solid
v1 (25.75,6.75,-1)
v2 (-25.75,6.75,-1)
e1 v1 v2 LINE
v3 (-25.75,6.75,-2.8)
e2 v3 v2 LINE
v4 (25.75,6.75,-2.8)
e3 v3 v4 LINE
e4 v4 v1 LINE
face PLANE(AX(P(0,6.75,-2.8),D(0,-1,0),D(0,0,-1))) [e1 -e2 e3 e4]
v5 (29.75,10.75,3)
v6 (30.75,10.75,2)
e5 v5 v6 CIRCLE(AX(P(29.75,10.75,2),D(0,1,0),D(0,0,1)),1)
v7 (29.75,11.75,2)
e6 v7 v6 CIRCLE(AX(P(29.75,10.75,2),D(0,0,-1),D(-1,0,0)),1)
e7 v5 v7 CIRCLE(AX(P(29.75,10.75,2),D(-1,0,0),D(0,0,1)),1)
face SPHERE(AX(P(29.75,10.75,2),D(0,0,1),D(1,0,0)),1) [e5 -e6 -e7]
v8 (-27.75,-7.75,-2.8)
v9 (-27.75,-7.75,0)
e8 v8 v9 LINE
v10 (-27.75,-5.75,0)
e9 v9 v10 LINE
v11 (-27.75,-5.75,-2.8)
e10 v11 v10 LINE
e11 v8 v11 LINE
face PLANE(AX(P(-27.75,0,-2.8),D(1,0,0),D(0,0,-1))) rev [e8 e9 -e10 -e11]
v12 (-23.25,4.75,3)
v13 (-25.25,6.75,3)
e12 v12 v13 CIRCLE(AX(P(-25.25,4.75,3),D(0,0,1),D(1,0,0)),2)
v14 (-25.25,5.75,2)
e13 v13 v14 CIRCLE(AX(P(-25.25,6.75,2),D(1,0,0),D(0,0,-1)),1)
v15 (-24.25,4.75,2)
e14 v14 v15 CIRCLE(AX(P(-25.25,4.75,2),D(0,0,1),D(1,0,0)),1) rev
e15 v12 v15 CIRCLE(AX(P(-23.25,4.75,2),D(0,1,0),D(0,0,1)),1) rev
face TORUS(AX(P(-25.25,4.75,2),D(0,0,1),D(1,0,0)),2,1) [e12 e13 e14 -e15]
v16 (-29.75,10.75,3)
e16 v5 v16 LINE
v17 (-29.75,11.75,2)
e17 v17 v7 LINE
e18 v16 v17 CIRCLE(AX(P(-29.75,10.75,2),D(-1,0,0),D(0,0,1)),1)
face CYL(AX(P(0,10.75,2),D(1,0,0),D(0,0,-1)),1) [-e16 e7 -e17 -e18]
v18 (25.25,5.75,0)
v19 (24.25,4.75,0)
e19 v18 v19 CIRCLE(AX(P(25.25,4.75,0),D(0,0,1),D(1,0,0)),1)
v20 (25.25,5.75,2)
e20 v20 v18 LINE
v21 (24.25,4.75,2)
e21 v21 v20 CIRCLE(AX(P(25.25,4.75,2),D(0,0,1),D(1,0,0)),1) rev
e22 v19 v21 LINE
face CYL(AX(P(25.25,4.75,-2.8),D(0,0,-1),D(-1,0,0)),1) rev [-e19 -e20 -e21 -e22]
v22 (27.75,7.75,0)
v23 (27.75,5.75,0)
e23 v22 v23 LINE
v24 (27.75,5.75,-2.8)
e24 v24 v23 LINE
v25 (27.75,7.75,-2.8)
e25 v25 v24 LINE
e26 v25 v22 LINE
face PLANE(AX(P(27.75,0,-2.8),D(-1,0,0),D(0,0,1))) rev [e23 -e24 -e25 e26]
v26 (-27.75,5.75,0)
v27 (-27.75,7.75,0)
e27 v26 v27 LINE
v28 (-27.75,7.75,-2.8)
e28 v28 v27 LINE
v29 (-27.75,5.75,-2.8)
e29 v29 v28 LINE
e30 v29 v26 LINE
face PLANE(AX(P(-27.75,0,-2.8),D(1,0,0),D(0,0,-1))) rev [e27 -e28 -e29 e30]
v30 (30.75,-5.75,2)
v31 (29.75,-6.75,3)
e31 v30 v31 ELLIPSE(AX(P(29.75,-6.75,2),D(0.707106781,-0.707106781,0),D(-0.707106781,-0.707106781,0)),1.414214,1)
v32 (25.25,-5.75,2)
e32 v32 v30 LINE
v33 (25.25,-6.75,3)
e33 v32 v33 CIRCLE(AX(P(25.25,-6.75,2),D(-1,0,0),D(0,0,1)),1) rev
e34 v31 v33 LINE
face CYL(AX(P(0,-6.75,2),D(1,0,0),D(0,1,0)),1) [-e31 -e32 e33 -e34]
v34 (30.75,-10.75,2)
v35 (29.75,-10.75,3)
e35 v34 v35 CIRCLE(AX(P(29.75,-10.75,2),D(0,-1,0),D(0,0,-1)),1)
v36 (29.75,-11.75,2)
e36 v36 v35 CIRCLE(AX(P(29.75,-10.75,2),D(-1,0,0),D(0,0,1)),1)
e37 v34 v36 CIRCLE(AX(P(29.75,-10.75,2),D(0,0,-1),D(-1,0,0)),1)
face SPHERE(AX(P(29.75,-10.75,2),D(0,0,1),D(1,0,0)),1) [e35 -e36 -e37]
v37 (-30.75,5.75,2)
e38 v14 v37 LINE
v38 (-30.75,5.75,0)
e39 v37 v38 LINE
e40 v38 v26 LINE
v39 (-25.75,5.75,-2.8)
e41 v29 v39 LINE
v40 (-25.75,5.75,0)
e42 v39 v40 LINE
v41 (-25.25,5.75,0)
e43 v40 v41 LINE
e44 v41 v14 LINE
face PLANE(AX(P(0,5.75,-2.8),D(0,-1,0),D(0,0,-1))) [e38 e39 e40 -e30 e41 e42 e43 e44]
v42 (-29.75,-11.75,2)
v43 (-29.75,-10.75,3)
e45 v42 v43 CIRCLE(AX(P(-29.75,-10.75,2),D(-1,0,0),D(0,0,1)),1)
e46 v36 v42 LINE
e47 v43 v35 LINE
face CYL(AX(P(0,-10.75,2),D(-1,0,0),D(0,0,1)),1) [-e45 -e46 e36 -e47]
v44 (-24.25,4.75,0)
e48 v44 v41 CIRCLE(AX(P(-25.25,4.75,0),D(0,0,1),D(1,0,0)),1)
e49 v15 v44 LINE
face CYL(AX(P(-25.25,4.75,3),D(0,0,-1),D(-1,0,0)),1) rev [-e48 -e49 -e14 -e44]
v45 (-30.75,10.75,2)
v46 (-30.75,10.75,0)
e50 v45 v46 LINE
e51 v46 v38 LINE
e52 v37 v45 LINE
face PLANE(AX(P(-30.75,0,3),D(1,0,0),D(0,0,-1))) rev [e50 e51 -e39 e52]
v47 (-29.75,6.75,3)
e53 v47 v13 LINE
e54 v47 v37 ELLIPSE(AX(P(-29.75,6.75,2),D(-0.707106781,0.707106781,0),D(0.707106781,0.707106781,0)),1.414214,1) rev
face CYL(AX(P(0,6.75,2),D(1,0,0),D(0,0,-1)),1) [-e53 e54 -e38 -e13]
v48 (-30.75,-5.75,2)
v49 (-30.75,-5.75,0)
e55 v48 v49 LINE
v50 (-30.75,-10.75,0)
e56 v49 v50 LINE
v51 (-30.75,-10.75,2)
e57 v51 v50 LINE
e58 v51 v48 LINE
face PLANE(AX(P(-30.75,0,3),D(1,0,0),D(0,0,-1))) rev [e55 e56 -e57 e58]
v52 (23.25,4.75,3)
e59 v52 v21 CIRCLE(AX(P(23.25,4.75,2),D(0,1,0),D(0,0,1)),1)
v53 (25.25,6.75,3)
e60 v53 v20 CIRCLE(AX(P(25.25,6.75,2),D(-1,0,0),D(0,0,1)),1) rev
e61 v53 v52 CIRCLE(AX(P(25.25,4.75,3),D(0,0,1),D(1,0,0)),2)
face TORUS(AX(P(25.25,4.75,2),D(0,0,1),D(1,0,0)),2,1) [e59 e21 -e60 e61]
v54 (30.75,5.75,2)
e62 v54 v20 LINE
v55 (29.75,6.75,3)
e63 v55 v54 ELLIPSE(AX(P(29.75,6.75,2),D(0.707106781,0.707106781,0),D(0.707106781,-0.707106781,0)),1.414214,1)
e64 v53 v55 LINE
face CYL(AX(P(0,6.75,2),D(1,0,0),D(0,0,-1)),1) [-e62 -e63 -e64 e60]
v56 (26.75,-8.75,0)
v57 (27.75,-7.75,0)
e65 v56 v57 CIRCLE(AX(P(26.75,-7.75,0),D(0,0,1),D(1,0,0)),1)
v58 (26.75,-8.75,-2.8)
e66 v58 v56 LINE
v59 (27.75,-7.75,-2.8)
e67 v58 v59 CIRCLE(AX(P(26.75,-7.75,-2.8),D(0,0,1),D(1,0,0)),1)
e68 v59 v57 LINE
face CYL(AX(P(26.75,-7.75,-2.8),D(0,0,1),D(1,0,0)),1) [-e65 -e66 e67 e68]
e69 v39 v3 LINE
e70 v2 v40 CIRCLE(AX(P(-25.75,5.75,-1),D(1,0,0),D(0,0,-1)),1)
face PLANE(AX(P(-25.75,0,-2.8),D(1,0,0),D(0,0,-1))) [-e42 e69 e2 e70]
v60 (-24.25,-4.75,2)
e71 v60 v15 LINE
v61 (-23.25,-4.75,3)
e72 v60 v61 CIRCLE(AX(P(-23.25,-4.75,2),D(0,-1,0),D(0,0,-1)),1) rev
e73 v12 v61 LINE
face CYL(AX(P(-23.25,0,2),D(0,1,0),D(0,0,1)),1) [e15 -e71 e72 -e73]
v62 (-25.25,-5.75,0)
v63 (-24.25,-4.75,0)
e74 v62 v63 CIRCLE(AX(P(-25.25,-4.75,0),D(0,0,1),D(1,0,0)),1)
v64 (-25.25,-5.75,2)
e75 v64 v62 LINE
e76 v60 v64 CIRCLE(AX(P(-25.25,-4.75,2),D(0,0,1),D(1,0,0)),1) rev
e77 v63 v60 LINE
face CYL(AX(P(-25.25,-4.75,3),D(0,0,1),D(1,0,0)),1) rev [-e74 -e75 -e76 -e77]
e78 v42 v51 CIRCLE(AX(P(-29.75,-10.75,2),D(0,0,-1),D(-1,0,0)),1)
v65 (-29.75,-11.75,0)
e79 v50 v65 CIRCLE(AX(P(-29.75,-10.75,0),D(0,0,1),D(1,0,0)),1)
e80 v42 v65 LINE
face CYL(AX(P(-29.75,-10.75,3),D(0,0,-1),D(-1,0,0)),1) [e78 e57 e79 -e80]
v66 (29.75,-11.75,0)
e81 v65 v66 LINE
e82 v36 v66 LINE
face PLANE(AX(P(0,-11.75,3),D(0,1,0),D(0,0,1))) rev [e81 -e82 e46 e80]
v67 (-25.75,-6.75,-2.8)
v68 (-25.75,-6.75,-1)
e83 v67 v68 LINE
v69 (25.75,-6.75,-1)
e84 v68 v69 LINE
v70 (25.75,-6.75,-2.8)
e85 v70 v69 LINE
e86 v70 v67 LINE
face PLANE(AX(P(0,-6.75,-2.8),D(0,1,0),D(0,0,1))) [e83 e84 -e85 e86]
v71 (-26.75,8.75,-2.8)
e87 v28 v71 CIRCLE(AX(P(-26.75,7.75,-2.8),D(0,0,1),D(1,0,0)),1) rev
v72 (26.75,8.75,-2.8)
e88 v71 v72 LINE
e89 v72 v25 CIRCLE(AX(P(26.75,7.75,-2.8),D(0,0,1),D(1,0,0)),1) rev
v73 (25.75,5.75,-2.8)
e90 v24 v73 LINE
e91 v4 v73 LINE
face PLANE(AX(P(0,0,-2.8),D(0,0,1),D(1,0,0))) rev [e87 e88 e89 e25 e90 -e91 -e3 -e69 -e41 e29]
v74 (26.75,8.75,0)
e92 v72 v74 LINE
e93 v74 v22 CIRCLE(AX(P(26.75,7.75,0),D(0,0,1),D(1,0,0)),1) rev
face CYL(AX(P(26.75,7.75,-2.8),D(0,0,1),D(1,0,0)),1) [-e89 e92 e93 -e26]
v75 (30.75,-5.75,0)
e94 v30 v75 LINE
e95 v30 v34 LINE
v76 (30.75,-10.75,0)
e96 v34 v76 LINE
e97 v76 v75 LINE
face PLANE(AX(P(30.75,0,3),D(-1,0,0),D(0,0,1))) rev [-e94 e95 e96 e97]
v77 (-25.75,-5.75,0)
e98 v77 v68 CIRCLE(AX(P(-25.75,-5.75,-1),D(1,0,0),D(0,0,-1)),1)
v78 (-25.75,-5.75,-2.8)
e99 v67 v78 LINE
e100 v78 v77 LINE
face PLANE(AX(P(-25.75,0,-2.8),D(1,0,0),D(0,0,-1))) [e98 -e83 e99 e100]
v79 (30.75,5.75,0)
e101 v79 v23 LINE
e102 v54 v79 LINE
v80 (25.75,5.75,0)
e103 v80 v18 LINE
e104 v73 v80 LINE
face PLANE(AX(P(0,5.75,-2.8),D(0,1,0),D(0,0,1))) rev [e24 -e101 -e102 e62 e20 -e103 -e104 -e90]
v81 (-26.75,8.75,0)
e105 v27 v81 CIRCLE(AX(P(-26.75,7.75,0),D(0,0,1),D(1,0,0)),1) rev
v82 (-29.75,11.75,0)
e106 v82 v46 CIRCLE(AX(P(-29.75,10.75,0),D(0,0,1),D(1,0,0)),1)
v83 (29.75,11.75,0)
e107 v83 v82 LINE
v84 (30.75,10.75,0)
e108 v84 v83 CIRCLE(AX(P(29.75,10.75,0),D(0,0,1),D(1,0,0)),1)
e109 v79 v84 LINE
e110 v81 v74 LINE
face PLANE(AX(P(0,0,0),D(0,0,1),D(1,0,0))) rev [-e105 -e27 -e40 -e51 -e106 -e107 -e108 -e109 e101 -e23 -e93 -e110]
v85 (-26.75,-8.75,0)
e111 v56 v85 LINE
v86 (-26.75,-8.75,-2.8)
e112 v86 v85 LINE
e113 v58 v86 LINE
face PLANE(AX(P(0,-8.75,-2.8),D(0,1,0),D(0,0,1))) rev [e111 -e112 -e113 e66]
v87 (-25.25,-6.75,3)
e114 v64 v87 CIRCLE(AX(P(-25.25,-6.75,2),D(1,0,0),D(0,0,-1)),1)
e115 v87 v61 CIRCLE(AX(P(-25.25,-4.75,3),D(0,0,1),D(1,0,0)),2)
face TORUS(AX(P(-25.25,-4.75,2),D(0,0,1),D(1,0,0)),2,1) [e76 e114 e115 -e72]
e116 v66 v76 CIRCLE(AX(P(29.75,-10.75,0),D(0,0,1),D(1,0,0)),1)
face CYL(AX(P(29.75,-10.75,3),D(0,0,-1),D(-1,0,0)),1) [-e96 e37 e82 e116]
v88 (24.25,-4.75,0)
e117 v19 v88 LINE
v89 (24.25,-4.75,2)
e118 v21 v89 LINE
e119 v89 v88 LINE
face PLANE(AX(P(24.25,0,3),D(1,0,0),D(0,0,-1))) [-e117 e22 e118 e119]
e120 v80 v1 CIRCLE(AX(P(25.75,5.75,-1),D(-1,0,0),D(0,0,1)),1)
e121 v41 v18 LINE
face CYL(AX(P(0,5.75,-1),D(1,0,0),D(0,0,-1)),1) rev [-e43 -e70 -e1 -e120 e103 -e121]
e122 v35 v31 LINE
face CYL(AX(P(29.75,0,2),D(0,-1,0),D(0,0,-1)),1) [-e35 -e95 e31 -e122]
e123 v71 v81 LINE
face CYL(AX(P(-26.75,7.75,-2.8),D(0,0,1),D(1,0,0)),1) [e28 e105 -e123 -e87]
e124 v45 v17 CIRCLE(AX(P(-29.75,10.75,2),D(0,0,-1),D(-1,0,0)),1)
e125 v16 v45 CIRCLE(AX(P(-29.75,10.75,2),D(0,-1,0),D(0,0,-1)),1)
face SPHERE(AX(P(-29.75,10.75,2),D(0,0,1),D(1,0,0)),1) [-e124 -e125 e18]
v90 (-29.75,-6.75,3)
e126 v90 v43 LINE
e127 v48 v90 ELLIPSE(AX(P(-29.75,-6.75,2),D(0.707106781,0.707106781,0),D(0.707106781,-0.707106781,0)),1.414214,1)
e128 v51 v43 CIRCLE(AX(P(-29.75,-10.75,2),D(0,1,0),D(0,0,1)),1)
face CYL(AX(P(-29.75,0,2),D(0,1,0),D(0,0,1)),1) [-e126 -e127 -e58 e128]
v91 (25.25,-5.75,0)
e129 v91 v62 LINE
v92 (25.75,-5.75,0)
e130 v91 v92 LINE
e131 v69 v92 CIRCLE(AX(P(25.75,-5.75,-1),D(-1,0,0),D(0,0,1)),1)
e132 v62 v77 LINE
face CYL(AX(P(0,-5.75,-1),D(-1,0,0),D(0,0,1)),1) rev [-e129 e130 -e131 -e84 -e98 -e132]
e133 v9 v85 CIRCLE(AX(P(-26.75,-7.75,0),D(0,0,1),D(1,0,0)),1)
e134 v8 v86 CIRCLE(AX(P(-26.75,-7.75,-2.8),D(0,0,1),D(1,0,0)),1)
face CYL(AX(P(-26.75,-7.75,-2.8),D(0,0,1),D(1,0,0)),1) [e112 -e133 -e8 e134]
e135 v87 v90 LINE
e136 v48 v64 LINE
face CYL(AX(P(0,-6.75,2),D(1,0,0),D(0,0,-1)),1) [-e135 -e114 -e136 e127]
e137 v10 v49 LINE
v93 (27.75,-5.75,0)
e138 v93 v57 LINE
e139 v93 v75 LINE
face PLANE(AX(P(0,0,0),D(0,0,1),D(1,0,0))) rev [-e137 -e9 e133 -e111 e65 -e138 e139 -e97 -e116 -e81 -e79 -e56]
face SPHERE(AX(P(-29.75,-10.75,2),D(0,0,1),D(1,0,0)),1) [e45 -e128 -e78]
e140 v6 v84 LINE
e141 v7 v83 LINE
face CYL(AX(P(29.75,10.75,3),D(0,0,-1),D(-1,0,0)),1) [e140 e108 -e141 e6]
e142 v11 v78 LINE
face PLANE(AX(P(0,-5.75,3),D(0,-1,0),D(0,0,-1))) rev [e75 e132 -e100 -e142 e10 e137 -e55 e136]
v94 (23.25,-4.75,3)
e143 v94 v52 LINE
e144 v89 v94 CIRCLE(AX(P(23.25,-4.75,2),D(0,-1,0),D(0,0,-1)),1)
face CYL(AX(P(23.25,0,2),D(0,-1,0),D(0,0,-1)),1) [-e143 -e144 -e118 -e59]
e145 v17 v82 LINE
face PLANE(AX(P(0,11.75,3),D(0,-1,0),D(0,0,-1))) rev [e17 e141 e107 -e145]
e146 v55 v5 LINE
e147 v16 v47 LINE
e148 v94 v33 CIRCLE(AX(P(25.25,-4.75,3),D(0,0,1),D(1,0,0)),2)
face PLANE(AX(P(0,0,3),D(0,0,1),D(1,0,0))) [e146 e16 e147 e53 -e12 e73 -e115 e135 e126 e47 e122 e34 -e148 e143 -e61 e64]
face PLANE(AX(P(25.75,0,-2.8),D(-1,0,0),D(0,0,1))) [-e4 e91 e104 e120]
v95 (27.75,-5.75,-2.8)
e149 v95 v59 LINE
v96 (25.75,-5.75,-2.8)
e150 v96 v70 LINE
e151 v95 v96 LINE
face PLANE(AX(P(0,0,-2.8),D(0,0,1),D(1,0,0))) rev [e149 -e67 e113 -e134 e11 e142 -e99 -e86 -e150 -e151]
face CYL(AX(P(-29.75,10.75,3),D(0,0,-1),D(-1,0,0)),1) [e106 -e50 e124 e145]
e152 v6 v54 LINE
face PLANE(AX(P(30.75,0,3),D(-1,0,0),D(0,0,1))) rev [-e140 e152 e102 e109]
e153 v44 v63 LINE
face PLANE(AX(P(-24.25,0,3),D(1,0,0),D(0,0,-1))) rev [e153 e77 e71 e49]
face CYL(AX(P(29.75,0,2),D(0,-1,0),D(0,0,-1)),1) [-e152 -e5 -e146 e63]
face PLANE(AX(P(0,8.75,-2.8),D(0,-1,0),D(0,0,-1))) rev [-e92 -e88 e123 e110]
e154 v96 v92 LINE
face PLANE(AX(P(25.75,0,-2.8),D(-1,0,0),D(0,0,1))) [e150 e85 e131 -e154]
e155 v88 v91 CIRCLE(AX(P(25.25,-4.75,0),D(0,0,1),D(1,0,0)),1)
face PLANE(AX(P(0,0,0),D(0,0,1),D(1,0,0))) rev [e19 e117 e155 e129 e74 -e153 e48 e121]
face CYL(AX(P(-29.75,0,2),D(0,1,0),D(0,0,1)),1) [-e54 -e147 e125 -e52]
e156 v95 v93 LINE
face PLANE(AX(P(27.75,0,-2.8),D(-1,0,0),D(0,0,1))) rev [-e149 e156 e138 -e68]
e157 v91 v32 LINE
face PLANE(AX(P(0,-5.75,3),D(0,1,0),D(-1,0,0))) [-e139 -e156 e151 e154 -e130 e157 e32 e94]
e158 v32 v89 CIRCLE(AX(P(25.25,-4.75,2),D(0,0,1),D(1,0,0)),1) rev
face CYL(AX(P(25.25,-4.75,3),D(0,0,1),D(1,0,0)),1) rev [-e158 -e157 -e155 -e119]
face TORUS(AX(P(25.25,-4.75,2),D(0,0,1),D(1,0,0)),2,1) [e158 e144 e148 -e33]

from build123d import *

# Parameters (mm, degrees)
BOSS_EXTRUDE2_DEPTH   = 2.8
BOSS_EXTRUDE2_2_DEPTH = 2.8
BOSS_EXTRUDE1_START   = 3
BOSS_EXTRUDE1_DEPTH   = 3
FILLET1_R             = 1


with BuildPart() as part:
    # Sketch3 → Boss-Extrude2 (new body)
    with BuildSketch(Plane.XY):
        with BuildLine():
            Line((25.75, 5.75), (27.75, 5.75))
            Line((27.75, 5.75), (27.75, 7.75))
            ThreePointArc((27.75, 7.75), (27.457106781, 8.457106781), (26.75, 8.75))
            Line((26.75, 8.75), (-26.75, 8.75))
            ThreePointArc((-26.75, 8.75), (-27.457106781, 8.457106781), (-27.75, 7.75))
            Line((-27.75, 7.75), (-27.75, 5.75))
            Line((-27.75, 5.75), (-25.75, 5.75))
            Line((-25.75, 5.75), (-25.75, 6.75))
            Line((-25.75, 6.75), (25.75, 6.75))
            Line((25.75, 6.75), (25.75, 5.75))
        make_face()
    extrude(amount=-BOSS_EXTRUDE2_DEPTH)



with BuildPart() as body_2:
    # Sketch3 → Boss-Extrude2 2 (new body)
    with BuildSketch(Plane.XY):
        with BuildLine():
            Line((-25.75, -6.75), (-25.75, -5.75))
            Line((-25.75, -5.75), (-27.75, -5.75))
            Line((-27.75, -5.75), (-27.75, -7.75))
            ThreePointArc((-27.75, -7.75), (-27.457106781, -8.457106781), (-26.75, -8.75))
            Line((-26.75, -8.75), (26.75, -8.75))
            ThreePointArc((26.75, -8.75), (27.457106781, -8.457106781), (27.75, -7.75))
            Line((27.75, -7.75), (27.75, -5.75))
            Line((27.75, -5.75), (25.75, -5.75))
            Line((25.75, -5.75), (25.75, -6.75))
            Line((25.75, -6.75), (-25.75, -6.75))
        make_face()
    extrude(amount=-BOSS_EXTRUDE2_2_DEPTH)


with BuildPart() as part_1:
    add(part.part)

    add(body_2.part)  # Boss-Extrude1 merges body 2
    # Sketch2 → Boss-Extrude1 (add)
    with BuildSketch(Plane.XY.offset(BOSS_EXTRUDE1_START)):
        with BuildLine():
            Line((24.25, 5.75), (27.75, 5.75))
            Line((27.75, 5.75), (27.75, 7.75))
            ThreePointArc((27.75, 7.75), (27.457106781, 8.457106781), (26.75, 8.75))
            Line((26.75, 8.75), (-26.75, 8.75))
            ThreePointArc((-26.75, 8.75), (-27.457106781, 8.457106781), (-27.75, 7.75))
            Line((-27.75, 7.75), (-27.75, 5.75))
            Line((-27.75, 5.75), (-24.25, 5.75))
            Line((-24.25, 5.75), (-24.25, -5.75))
            Line((-24.25, -5.75), (-27.75, -5.75))
            Line((-27.75, -5.75), (-27.75, -7.75))
            ThreePointArc((-27.75, -7.75), (-27.457106781, -8.457106781), (-26.75, -8.75))
            Line((-26.75, -8.75), (26.75, -8.75))
            ThreePointArc((26.75, -8.75), (27.457106781, -8.457106781), (27.75, -7.75))
            Line((27.75, -7.75), (27.75, -5.75))
            Line((27.75, -5.75), (24.25, -5.75))
            Line((24.25, -5.75), (24.25, 5.75))
        make_face()
        with BuildLine():
            ThreePointArc((30.75, 10.75), (30.457106781, 11.457106781), (29.75, 11.75))
            Line((29.75, 11.75), (-29.75, 11.75))
            ThreePointArc((-29.75, 11.75), (-30.457106781, 11.457106781), (-30.75, 10.75))
            Line((-30.75, 10.75), (-30.75, 5.75))
            Line((-30.75, 5.75), (-27.75, 5.75))
            Line((-27.75, 5.75), (-27.75, 7.75))
            ThreePointArc((-27.75, 7.75), (-27.457106781, 8.457106781), (-26.75, 8.75))
            Line((-26.75, 8.75), (26.75, 8.75))
            ThreePointArc((26.75, 8.75), (27.457106781, 8.457106781), (27.75, 7.75))
            Line((27.75, 7.75), (27.75, 5.75))
            Line((27.75, 5.75), (30.75, 5.75))
            Line((30.75, 5.75), (30.75, 10.75))
        make_face()
        with BuildLine():
            Line((-30.75, -5.75), (-30.75, -10.75))
            ThreePointArc((-30.75, -10.75), (-30.457106781, -11.457106781), (-29.75, -11.75))
            Line((-29.75, -11.75), (29.75, -11.75))
            ThreePointArc((29.75, -11.75), (30.457106781, -11.457106781), (30.75, -10.75))
            Line((30.75, -10.75), (30.75, -5.75))
            Line((30.75, -5.75), (27.75, -5.75))
            Line((27.75, -5.75), (27.75, -7.75))
            ThreePointArc((27.75, -7.75), (27.457106781, -8.457106781), (26.75, -8.75))
            Line((26.75, -8.75), (-26.75, -8.75))
            ThreePointArc((-26.75, -8.75), (-27.457106781, -8.457106781), (-27.75, -7.75))
            Line((-27.75, -7.75), (-27.75, -5.75))
            Line((-27.75, -5.75), (-30.75, -5.75))
        make_face()
    extrude(amount=-BOSS_EXTRUDE1_DEPTH)

    # Fillet1
    fillet1_edges = [part_1.edges().sort_by_distance(p)[0] for p in [
        (24.25, -5.75, 1.5),
        (24.25, 5.75, 1.5),
        (-24.25, -5.75, 1.5),
        (-24.25, 5.75, 1.5),
        (-24.25, 0, 3),
        (-27.5, 5.75, 3),
        (-30.75, 8.25, 3),
        (-30.457106781, 11.457106781, 3),
        (0, 11.75, 3),
        (30.457106781, 11.457106781, 3),
        (30.75, 8.25, 3),
        (27.5, 5.75, 3),
        (24.25, 0, 3),
        (27.5, -5.75, 3),
        (30.75, -8.25, 3),
        (30.457106781, -11.457106781, 3),
        (0, -11.75, 3),
        (-30.457106781, -11.457106781, 3),
        (-30.75, -8.25, 3),
        (-27.5, -5.75, 3),
        (0, 6.75, 0),
        (0, -6.75, 0),
    ]]
    fillet(fillet1_edges, radius=FILLET1_R - 0.0001)  # a hair under: the kernel refuses the full size


solid = part_1.part
